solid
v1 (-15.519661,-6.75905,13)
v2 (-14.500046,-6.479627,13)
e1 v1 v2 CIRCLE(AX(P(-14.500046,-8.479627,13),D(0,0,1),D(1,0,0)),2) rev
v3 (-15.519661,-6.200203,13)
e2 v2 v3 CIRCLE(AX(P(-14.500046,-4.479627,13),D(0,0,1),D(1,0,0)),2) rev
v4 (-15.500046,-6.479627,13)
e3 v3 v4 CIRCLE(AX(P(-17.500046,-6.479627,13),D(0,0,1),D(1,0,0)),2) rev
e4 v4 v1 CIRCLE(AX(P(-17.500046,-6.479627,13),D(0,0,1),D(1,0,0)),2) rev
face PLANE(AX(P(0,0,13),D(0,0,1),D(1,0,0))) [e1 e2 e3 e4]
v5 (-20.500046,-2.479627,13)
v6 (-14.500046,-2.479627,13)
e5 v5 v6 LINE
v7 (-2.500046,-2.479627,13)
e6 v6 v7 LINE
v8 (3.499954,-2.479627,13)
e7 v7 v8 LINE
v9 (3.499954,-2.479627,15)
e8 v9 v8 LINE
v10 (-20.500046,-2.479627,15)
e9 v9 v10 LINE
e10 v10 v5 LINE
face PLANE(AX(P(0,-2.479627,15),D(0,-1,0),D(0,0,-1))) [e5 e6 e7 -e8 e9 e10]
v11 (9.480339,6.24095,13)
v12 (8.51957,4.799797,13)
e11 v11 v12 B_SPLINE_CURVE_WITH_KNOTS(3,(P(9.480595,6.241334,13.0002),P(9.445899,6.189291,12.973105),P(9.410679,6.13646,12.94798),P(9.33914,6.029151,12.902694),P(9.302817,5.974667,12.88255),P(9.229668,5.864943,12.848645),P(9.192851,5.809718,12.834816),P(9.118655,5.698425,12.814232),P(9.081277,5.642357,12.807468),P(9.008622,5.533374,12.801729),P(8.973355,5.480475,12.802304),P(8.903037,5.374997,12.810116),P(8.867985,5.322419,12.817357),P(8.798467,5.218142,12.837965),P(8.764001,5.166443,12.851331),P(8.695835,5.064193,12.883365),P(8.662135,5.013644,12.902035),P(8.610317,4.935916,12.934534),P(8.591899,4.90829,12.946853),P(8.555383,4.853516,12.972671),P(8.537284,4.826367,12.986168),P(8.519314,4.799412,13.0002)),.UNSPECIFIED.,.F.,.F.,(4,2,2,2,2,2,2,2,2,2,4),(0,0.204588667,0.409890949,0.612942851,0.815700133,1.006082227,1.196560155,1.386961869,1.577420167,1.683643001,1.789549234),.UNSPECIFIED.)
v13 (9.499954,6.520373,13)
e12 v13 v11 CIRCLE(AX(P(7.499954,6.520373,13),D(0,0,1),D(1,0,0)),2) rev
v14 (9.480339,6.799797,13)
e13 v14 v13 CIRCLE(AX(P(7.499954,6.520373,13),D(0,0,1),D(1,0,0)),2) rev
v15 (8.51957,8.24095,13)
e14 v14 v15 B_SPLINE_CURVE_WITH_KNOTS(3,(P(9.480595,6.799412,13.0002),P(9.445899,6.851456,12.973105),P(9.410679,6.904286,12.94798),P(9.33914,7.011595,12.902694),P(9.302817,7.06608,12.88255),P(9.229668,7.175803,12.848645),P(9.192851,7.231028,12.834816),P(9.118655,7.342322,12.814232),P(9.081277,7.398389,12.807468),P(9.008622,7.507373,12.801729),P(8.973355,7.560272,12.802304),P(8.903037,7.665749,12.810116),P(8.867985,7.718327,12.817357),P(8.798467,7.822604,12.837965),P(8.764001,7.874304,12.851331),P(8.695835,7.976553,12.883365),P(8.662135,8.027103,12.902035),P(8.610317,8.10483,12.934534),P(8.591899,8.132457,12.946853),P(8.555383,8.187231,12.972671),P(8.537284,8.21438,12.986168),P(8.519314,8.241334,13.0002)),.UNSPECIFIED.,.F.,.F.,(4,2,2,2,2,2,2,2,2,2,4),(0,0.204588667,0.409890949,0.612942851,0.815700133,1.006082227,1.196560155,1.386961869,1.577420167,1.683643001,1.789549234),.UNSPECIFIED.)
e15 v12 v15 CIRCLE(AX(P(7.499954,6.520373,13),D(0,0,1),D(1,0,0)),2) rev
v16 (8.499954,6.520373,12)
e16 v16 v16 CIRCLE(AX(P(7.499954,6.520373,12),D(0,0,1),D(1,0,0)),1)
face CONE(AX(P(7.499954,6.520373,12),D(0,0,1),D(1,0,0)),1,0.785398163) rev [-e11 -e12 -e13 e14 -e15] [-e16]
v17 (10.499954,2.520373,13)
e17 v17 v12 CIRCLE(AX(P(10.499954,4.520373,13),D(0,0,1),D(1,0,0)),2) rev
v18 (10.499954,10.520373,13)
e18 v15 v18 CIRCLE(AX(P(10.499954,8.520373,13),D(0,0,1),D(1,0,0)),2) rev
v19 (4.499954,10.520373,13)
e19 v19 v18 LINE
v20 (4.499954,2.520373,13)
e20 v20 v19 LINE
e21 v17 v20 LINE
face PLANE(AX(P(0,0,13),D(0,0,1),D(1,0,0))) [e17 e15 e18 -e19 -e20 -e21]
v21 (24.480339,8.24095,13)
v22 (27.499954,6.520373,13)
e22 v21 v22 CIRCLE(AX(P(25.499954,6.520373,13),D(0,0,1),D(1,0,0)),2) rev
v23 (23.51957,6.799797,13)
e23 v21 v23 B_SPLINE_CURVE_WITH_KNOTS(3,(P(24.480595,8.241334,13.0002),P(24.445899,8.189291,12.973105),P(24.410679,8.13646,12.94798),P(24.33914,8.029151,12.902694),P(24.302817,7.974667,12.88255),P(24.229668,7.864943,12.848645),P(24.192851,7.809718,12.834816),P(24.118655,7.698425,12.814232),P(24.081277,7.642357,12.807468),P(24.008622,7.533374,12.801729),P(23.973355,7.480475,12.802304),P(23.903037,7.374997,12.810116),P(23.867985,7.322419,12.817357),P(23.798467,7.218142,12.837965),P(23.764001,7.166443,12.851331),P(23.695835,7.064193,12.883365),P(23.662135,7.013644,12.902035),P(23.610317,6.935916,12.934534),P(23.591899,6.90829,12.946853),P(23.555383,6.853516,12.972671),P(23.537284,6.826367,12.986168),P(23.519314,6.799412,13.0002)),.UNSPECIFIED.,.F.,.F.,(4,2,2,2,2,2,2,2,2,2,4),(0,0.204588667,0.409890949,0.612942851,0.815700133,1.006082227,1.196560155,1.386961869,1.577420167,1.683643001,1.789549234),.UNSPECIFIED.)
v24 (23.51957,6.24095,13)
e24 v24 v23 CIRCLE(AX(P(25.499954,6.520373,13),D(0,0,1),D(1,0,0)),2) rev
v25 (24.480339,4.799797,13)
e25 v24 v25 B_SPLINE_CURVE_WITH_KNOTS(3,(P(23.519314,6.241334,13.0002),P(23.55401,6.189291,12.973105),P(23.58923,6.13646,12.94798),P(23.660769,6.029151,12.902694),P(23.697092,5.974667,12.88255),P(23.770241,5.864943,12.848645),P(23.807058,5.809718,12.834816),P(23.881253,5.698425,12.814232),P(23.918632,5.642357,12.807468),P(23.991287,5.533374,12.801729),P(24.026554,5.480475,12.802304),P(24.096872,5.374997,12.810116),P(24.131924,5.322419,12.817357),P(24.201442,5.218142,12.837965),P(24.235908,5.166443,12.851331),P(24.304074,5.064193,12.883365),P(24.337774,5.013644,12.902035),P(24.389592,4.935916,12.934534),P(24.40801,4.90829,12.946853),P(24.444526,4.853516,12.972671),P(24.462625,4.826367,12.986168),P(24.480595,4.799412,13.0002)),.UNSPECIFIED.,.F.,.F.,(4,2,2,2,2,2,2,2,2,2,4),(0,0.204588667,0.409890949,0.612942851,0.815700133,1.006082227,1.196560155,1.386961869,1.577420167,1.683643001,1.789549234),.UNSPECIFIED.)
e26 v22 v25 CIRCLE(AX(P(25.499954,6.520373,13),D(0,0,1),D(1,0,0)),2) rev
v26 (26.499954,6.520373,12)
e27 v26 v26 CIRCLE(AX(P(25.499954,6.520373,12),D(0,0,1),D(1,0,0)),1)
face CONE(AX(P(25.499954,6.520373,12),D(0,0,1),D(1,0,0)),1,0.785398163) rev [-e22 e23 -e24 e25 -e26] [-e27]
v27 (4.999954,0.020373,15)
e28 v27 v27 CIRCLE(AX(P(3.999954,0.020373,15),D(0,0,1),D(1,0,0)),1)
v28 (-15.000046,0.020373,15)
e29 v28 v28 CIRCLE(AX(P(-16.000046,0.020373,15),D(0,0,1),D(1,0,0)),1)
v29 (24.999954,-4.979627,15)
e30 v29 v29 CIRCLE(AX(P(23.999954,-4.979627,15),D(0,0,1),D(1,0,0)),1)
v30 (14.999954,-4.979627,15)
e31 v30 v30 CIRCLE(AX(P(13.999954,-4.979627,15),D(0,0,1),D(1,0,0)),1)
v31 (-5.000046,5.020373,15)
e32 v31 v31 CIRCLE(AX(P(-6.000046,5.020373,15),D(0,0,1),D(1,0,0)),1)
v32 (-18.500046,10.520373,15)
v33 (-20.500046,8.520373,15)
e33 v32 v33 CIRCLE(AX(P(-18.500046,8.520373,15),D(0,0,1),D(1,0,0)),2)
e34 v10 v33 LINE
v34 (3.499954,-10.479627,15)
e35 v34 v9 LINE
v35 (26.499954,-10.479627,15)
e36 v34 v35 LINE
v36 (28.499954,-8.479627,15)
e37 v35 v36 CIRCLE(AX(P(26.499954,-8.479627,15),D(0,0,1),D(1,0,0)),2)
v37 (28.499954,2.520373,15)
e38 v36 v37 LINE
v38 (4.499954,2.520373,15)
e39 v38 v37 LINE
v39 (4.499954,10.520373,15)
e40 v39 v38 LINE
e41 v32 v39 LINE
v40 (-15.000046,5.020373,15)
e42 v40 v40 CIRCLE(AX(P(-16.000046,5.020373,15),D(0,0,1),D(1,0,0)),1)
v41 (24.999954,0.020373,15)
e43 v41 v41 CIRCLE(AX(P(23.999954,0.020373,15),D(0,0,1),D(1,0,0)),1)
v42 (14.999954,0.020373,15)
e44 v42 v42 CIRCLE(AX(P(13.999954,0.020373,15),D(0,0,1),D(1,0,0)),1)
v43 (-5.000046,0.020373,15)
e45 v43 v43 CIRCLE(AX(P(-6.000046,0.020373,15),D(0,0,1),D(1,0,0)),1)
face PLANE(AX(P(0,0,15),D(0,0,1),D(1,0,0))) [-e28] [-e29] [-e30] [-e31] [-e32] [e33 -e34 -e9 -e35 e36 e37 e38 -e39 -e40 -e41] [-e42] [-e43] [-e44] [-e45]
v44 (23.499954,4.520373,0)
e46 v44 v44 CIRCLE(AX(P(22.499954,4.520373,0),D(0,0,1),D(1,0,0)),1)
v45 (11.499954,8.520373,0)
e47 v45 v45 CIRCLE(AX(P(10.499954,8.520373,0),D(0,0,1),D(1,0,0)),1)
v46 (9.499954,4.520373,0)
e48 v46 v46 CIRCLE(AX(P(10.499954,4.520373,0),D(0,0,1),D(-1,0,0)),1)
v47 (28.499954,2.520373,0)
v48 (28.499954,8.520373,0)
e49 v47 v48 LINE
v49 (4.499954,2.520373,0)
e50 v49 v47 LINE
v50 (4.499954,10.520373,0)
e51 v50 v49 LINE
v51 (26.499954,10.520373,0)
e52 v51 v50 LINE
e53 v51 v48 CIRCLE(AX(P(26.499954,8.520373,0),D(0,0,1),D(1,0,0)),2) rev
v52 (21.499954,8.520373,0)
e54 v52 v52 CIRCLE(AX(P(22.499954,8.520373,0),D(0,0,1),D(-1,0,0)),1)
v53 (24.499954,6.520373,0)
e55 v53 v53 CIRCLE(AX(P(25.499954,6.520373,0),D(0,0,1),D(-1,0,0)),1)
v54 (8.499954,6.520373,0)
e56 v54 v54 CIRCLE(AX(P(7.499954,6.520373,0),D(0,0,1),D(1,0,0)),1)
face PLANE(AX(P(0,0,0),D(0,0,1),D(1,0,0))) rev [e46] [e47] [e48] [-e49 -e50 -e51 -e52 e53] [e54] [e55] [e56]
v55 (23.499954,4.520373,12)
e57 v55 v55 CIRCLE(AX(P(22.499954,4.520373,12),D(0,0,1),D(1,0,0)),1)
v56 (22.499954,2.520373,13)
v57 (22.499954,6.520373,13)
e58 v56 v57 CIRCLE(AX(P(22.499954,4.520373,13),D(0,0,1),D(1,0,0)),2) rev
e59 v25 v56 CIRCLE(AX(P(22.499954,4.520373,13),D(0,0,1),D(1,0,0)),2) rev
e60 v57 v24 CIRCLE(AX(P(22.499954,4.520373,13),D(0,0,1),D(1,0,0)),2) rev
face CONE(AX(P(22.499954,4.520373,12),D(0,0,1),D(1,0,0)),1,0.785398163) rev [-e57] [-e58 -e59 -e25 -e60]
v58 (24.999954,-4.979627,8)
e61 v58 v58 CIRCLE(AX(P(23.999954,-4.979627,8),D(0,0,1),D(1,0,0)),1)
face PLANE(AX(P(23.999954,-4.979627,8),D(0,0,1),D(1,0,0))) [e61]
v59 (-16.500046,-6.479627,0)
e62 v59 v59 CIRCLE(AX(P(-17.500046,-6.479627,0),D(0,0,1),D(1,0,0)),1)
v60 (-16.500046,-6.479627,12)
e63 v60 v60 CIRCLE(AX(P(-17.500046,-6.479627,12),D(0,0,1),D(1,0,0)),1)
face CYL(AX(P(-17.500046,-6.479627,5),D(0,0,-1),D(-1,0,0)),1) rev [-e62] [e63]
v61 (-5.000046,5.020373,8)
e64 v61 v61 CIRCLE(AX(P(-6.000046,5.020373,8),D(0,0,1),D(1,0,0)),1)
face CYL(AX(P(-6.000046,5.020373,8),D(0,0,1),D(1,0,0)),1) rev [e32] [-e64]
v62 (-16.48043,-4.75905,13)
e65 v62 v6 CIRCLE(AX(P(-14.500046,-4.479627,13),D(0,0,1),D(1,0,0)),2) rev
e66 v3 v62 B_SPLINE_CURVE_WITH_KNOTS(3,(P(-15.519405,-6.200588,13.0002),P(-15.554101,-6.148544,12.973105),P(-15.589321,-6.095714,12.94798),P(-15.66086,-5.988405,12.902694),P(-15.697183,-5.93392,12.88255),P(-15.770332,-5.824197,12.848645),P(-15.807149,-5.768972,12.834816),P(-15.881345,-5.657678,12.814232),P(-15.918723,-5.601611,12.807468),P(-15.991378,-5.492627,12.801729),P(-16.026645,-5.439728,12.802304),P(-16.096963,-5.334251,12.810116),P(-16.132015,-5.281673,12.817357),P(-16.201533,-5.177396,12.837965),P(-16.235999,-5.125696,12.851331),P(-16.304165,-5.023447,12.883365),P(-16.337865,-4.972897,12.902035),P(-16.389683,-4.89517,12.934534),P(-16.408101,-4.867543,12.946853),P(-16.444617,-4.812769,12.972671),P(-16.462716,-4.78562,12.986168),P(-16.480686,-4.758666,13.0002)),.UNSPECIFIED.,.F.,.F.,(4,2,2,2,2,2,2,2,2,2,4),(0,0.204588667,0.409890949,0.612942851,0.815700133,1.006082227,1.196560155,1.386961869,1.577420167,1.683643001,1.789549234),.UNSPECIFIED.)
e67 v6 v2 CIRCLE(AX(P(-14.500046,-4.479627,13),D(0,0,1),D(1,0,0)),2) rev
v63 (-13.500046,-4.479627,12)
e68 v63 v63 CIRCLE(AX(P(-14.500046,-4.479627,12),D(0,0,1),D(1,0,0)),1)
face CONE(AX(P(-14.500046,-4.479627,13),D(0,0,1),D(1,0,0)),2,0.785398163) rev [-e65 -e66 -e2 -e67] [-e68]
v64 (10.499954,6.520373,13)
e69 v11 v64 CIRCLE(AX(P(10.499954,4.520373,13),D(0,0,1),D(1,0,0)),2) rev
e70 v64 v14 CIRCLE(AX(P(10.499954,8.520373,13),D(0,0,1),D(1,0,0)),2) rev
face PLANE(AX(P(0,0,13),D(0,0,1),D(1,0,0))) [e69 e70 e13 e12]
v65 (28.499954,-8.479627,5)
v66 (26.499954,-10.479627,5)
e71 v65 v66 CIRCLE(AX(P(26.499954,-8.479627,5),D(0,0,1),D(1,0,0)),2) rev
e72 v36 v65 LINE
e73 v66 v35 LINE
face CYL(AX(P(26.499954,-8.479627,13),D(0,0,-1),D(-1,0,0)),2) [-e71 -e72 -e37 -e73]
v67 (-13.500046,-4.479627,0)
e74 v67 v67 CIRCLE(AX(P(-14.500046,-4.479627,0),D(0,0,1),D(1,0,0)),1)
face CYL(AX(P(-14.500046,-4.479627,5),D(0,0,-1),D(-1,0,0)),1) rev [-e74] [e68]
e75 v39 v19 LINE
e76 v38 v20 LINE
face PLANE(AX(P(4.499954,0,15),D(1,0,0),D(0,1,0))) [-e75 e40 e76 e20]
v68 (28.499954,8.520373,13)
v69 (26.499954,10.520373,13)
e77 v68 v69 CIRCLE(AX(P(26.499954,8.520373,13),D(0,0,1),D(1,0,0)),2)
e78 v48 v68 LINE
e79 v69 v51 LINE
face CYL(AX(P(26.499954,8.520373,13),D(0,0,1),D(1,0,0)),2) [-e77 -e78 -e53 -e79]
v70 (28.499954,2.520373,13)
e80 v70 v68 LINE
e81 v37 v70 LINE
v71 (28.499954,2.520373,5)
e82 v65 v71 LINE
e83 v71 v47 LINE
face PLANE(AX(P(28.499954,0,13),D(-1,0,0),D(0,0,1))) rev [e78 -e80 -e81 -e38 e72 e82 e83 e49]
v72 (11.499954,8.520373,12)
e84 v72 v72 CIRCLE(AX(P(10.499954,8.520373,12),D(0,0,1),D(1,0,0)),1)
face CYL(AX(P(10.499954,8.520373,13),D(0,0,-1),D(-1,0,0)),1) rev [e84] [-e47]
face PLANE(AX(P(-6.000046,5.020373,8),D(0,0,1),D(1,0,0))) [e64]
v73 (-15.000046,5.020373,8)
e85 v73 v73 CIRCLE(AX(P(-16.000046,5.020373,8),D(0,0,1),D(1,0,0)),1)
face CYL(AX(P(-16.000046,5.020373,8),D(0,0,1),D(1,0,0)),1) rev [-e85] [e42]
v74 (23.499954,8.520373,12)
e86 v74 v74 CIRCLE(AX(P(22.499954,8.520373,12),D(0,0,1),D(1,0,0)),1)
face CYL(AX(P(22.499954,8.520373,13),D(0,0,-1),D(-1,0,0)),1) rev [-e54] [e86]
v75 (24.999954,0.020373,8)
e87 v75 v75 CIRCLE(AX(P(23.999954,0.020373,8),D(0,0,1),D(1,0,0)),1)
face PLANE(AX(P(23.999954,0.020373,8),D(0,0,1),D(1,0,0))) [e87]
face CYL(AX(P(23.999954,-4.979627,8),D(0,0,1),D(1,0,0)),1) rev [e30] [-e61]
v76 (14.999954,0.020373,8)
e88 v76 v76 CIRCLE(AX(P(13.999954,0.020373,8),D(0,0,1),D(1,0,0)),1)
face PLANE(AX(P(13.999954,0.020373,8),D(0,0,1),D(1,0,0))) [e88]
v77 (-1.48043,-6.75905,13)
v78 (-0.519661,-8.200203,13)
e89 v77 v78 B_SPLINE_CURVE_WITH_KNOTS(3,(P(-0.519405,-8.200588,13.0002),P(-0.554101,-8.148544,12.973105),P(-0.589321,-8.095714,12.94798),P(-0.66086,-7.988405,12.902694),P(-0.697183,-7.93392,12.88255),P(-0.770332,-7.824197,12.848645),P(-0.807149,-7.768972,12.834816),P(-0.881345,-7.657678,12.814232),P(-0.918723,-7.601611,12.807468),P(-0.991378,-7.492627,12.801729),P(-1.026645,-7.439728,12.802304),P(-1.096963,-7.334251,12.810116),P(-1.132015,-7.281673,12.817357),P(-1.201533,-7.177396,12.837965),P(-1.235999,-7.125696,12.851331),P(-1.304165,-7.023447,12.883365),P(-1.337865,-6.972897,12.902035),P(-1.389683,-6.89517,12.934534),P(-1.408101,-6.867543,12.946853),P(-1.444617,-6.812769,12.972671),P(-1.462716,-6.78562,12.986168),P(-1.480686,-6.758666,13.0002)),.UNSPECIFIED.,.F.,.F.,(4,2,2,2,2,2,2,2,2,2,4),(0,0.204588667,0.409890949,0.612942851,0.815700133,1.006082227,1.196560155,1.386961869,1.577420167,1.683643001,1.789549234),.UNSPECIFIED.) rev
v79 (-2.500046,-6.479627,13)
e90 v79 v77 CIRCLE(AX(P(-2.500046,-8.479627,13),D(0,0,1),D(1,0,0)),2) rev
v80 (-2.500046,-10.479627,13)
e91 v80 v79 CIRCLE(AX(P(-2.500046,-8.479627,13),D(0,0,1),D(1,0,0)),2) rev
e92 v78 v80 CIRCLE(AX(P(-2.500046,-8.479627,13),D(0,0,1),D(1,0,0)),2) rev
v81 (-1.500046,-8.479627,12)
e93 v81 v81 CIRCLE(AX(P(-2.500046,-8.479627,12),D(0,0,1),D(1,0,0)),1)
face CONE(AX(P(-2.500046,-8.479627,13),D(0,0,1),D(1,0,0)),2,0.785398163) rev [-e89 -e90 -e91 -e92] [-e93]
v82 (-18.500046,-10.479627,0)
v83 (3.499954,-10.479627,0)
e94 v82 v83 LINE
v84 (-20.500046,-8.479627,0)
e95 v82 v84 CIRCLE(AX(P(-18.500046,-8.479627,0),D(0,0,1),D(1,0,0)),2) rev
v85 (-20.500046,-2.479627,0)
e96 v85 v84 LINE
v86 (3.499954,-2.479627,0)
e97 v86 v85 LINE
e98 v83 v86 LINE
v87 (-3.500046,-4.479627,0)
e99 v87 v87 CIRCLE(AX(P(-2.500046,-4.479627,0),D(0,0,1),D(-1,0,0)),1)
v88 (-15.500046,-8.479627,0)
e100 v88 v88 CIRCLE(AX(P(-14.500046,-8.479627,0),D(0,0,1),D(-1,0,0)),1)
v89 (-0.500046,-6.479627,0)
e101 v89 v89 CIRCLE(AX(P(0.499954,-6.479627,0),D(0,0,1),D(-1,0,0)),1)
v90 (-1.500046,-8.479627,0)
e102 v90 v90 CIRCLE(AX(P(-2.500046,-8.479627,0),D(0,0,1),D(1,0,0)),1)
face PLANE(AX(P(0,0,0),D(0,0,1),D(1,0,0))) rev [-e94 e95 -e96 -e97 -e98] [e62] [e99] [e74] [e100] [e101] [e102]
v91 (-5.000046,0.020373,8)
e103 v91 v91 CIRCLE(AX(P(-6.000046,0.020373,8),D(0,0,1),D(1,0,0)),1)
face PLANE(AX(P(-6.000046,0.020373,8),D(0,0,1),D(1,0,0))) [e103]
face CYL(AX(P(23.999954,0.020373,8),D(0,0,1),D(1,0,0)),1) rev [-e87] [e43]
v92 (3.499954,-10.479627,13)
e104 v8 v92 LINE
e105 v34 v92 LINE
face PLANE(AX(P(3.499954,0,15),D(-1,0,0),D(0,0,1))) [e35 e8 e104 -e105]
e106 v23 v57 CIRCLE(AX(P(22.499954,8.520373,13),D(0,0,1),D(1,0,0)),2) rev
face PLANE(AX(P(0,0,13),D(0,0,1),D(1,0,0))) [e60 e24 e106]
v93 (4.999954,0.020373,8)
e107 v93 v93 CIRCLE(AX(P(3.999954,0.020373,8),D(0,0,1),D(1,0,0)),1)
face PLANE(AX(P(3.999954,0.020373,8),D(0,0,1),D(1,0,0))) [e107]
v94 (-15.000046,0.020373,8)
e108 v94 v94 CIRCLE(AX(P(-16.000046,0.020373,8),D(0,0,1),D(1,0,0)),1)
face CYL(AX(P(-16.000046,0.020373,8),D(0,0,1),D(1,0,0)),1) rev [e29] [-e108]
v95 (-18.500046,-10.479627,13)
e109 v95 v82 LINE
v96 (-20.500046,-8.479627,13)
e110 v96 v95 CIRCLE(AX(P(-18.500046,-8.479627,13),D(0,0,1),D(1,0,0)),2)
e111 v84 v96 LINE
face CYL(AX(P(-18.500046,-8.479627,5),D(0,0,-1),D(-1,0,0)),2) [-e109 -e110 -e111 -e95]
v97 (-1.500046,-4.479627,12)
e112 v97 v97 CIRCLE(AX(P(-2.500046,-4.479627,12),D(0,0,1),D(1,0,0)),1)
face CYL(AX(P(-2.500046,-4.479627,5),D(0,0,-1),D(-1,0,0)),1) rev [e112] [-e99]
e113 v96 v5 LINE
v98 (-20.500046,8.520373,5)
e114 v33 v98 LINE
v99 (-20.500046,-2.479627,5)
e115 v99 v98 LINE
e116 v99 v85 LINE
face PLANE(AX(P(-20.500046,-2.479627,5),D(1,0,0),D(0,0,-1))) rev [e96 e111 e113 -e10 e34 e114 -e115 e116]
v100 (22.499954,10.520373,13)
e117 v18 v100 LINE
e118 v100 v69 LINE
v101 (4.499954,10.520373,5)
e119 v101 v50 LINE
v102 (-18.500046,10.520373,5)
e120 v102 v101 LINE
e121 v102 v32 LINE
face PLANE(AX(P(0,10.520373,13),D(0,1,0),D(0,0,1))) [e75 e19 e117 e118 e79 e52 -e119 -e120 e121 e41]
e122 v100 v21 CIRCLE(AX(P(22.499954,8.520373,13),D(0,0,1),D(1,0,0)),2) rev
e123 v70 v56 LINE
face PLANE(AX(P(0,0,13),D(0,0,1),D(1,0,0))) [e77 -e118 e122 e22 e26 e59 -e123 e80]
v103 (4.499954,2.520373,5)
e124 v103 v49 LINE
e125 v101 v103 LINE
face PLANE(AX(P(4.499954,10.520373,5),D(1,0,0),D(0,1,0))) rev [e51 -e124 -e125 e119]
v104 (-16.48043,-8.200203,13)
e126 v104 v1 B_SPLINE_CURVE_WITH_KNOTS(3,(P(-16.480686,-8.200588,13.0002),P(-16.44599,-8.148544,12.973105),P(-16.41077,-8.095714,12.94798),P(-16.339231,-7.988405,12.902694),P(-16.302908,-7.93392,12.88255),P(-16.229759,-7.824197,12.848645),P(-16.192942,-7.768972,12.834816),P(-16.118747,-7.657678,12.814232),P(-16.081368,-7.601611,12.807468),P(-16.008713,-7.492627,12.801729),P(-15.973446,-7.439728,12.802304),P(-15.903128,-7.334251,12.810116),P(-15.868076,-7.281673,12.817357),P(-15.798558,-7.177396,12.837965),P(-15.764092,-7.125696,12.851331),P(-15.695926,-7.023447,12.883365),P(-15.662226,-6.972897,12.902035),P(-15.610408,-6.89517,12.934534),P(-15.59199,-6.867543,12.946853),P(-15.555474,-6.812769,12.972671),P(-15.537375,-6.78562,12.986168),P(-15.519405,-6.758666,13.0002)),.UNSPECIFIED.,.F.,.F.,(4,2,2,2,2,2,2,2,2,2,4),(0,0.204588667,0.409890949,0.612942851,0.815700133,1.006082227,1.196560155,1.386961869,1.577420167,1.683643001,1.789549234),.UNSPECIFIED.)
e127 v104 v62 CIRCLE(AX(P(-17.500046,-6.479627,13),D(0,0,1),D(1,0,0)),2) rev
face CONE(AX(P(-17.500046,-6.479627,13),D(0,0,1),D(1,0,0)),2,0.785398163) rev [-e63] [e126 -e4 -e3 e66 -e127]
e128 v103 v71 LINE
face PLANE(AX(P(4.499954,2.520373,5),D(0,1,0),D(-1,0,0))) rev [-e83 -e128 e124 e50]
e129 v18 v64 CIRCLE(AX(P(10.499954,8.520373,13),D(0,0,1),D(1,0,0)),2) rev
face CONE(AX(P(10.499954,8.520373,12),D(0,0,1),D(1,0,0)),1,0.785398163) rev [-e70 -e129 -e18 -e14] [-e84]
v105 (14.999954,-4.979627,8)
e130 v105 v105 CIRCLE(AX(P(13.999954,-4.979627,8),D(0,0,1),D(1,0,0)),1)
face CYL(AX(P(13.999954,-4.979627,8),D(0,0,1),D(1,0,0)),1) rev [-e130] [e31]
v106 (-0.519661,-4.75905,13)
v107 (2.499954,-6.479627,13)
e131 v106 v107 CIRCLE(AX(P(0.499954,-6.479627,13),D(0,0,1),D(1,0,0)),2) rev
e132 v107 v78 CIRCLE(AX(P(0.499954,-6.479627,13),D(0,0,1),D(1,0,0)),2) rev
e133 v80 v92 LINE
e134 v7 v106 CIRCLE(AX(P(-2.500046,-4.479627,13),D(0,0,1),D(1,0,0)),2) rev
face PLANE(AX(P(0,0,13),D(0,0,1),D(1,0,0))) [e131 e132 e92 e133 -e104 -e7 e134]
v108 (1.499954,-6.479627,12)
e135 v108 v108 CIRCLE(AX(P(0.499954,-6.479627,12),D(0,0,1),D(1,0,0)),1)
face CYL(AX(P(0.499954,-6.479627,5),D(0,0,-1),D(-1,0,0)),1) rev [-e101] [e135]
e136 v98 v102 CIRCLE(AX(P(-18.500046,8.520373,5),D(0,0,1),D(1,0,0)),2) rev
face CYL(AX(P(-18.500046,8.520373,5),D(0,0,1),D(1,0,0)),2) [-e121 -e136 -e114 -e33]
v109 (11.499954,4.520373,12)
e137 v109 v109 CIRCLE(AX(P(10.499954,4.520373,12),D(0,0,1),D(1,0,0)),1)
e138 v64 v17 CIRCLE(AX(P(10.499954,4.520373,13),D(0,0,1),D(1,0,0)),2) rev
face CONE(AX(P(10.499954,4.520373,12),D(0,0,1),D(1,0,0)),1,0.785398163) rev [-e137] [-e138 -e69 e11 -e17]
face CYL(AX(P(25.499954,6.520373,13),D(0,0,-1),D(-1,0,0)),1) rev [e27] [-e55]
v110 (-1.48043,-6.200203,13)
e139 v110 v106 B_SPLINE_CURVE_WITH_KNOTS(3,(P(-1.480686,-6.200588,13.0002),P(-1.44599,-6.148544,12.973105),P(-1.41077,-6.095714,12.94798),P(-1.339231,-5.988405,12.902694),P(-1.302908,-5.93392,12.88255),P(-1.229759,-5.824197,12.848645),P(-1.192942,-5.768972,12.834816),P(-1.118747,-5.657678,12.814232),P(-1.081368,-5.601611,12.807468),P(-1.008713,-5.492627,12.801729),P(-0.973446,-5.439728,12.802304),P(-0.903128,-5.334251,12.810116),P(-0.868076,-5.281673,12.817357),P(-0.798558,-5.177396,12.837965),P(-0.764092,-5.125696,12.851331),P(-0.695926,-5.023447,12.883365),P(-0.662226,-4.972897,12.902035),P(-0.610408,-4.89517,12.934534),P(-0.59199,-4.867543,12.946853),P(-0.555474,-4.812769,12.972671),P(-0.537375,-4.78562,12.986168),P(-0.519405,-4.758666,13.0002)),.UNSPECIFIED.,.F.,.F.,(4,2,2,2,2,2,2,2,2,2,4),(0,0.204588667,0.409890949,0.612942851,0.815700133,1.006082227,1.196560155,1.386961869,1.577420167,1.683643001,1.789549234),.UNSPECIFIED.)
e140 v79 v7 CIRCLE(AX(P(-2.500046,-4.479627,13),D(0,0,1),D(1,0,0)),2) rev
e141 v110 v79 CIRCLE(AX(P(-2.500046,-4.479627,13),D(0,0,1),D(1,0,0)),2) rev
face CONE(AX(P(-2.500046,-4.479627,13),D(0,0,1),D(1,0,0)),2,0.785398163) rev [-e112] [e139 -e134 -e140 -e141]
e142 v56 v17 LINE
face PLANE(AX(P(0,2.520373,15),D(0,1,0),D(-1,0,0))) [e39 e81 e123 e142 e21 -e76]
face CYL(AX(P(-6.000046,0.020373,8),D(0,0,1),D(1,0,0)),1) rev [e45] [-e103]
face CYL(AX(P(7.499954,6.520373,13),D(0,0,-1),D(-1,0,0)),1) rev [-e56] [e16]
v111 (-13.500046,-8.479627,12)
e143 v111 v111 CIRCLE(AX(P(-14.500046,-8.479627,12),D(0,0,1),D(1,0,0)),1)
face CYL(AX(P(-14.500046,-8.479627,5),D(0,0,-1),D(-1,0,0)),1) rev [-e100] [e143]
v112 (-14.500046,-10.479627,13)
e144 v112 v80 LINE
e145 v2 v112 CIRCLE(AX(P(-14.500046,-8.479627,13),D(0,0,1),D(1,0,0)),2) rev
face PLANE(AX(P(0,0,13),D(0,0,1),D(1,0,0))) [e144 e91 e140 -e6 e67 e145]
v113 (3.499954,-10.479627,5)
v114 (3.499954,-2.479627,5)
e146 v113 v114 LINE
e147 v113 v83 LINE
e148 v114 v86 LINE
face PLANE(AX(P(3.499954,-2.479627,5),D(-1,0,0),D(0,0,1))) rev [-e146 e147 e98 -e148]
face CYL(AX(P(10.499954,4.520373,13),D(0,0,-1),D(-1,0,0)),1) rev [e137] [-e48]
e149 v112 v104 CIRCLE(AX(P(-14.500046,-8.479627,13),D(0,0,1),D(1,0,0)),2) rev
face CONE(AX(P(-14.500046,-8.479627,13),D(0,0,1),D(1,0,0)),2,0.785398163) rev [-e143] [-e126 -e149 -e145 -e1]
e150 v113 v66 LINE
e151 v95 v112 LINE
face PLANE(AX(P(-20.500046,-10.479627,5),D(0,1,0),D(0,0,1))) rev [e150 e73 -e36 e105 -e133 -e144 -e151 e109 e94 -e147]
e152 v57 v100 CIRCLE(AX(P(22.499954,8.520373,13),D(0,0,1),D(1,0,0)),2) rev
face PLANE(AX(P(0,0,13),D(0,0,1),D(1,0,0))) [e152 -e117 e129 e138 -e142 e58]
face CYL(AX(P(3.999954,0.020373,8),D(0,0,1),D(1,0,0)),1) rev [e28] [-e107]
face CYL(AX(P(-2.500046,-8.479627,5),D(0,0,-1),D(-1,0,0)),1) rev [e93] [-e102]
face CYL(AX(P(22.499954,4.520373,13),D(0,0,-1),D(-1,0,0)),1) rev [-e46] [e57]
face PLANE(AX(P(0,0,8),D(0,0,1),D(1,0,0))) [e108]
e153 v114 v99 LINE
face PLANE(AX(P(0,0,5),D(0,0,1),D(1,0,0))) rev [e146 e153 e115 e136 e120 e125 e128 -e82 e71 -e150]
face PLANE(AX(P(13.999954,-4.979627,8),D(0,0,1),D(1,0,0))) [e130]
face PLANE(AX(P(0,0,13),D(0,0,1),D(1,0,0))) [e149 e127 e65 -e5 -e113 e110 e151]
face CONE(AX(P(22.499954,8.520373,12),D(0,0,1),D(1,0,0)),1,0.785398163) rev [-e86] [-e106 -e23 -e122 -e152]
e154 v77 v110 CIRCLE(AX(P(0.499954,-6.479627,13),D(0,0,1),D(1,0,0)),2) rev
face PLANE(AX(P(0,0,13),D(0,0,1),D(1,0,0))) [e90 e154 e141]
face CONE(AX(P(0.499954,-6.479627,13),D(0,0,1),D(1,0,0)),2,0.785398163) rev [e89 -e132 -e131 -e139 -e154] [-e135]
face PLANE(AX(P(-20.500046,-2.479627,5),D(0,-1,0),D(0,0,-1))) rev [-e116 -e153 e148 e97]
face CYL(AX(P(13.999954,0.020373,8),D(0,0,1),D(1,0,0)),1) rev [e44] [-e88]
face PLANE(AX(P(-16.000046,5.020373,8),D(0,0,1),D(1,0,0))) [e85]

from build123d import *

# Parameters (mm, degrees)
SKETCH1_W             = 24
SKETCH1_H             = 8
SKETCH1_R             = 1
BOSS_EXTRUDE1_DEPTH   = 5
BOSS_EXTRUDE1_2_DEPTH = 5
SKETCH2_W             = 24
SKETCH2_H             = 8
SKETCH2_R             = 1
BOSS_EXTRUDE2_DEPTH   = 8
BOSS_EXTRUDE3_DEPTH   = 10
CHAMFER1_SIZE         = 1
FILLET1_R             = 2
SKETCH3_R             = 1
CUT_EXTRUDE1_DEPTH    = 7


with BuildPart() as part:
    # Sketch1 → Boss-Extrude1 (new body)
    with BuildSketch(Plane.XY):
        with Locations((-8.500045519, -6.479626746)):
            Rectangle(SKETCH1_W, SKETCH1_H)
        with Locations(Location((0.499954481, -6.479626746, 0), (0, 0, 180))):
            Circle(SKETCH1_R, mode=Mode.SUBTRACT)
        with Locations((-14.500045519, -4.479626746)):
            Circle(SKETCH1_R, mode=Mode.SUBTRACT)
        with Locations((-2.500045519, -8.479626746)):
            Circle(SKETCH1_R, mode=Mode.SUBTRACT)
        with Locations((-17.500045519, -6.479626746)):
            Circle(SKETCH1_R, mode=Mode.SUBTRACT)
        with Locations(Location((-14.500045519, -8.479626746, 0), (0, 0, 180))):
            Circle(SKETCH1_R, mode=Mode.SUBTRACT)
        with Locations(Location((-2.500045519, -4.479626746, 0), (0, 0, 180))):
            Circle(SKETCH1_R, mode=Mode.SUBTRACT)
    extrude(amount=BOSS_EXTRUDE1_DEPTH)



with BuildPart() as body_2:
    # Sketch1 → Boss-Extrude1 2 (new body)
    with BuildSketch(Plane.XY):
        with Locations((16.499954481, 6.520373254)):
            Rectangle(SKETCH1_W, SKETCH1_H)
        with Locations((10.499954481, 8.520373254)):
            Circle(SKETCH1_R, mode=Mode.SUBTRACT)
        with Locations((7.499954481, 6.520373254)):
            Circle(SKETCH1_R, mode=Mode.SUBTRACT)
        with Locations(Location((10.499954481, 4.520373254, 0), (0, 0, 180))):
            Circle(SKETCH1_R, mode=Mode.SUBTRACT)
        with Locations((22.499954481, 4.520373254)):
            Circle(SKETCH1_R, mode=Mode.SUBTRACT)
        with Locations(Location((25.499954481, 6.520373254, 0), (0, 0, 180))):
            Circle(SKETCH1_R, mode=Mode.SUBTRACT)
        with Locations(Location((22.499954481, 8.520373254, 0), (0, 0, 180))):
            Circle(SKETCH1_R, mode=Mode.SUBTRACT)
    extrude(amount=BOSS_EXTRUDE1_2_DEPTH)


with BuildPart() as part_1:
    add(part.part)

    add(body_2.part)  # Boss-Extrude2 merges body 2
    # Sketch2 → Boss-Extrude2 (add)
    # profile 1 of 3: a face of its own
    with BuildSketch(Plane.XY.offset(5)):
        with Locations((-8.500045519, -6.479626746)):
            Rectangle(SKETCH2_W, SKETCH2_H)
        with Locations(Location((-14.500045519, -8.479626746, 0), (0, 0, 180))):
            Circle(SKETCH2_R, mode=Mode.SUBTRACT)
        with Locations((-17.500045519, -6.479626746)):
            Circle(SKETCH2_R, mode=Mode.SUBTRACT)
        with Locations((-2.500045519, -8.479626746)):
            Circle(SKETCH2_R, mode=Mode.SUBTRACT)
        with Locations(Location((0.499954481, -6.479626746, 0), (0, 0, 180))):
            Circle(SKETCH2_R, mode=Mode.SUBTRACT)
        with Locations((-14.500045519, -4.479626746)):
            Circle(SKETCH2_R, mode=Mode.SUBTRACT)
        with Locations(Location((-2.500045519, -4.479626746, 0), (0, 0, 180))):
            Circle(SKETCH2_R, mode=Mode.SUBTRACT)
    # profile 2 of 3: a face of its own
    with BuildSketch(Plane.XY.offset(5)):
        Polygon((3.499954481, -2.479626746), (3.499954481, -10.479626746), (28.499954481, -10.479626746), (28.499954481, 2.520373254), (4.499954481, 2.520373254), (4.499954481, 10.520373254), (-20.500045519, 10.520373254), (-20.500045519, -2.479626746), align=None)
    # profile 3 of 3: a face of its own
    with BuildSketch(Plane.XY.offset(5)):
        with Locations((16.499954481, 6.520373254)):
            Rectangle(SKETCH2_W, SKETCH2_H)
        with Locations(Location((10.499954481, 4.520373254, 0), (0, 0, 180))):
            Circle(SKETCH2_R, mode=Mode.SUBTRACT)
        with Locations((22.499954481, 4.520373254)):
            Circle(SKETCH2_R, mode=Mode.SUBTRACT)
        with Locations((7.499954481, 6.520373254)):
            Circle(SKETCH2_R, mode=Mode.SUBTRACT)
        with Locations((10.499954481, 8.520373254)):
            Circle(SKETCH2_R, mode=Mode.SUBTRACT)
        with Locations(Location((25.499954481, 6.520373254, 0), (0, 0, 180))):
            Circle(SKETCH2_R, mode=Mode.SUBTRACT)
        with Locations(Location((22.499954481, 8.520373254, 0), (0, 0, 180))):
            Circle(SKETCH2_R, mode=Mode.SUBTRACT)
    extrude(amount=BOSS_EXTRUDE2_DEPTH)

    # Sketch2<6> → Boss-Extrude3 (add)
    with BuildSketch(Plane.XY.offset(5)):
        Polygon((3.499954481, -2.479626746), (3.499954481, -10.479626746), (28.499954481, -10.479626746), (28.499954481, 2.520373254), (4.499954481, 2.520373254), (4.499954481, 10.520373254), (-20.500045519, 10.520373254), (-20.500045519, -2.479626746), align=None)
    extrude(amount=BOSS_EXTRUDE3_DEPTH)

    # Chamfer1
    # the kernel refuses this chamfer: 1 mm, written as the material it takes off along each edge
    with BuildSketch(Plane(origin=(25.499954481, 6.520373254, 13), x_dir=(-1, 0, 0), z_dir=(0, 1, 0))) as chamfer1_piece_1:
        Polygon((1 + CHAMFER1_SIZE, 0), (1, -CHAMFER1_SIZE), (1, 0), align=None)
    revolve(axis=Axis((25.499954481, 6.520373254, 13), (0, 0, 1)), mode=Mode.SUBTRACT)
    with BuildSketch(Plane(origin=(22.499954481, 8.520373254, 13), x_dir=(-1, 0, 0), z_dir=(0, 1, 0))) as chamfer1_piece_2:
        Polygon((1 + CHAMFER1_SIZE, 0), (1, -CHAMFER1_SIZE), (1, 0), align=None)
    revolve(axis=Axis((22.499954481, 8.520373254, 13), (0, 0, 1)), mode=Mode.SUBTRACT)
    with BuildSketch(Plane(origin=(10.499954481, 4.520373254, 13), x_dir=(-1, 0, 0), z_dir=(0, 1, 0))) as chamfer1_piece_3_section:
        Polygon((1 + CHAMFER1_SIZE, 0), (1, -CHAMFER1_SIZE), (1, 0), align=None)
    chamfer1_piece_3 = revolve(axis=Axis((10.499954481, 4.520373254, 13), (0, 0, 1)), mode=Mode.PRIVATE)
    chamfer1_piece_3 = split(chamfer1_piece_3, bisect_by=Plane(origin=(11.988197193, 2.520373254, 12.511757288), z_dir=(0, 1, 0)), keep=Keep.TOP, mode=Mode.PRIVATE)
    add(chamfer1_piece_3, mode=Mode.SUBTRACT)
    with BuildSketch(Plane(origin=(10.499954481, 8.520373254, 13), x_dir=(1, 0, 0), z_dir=(0, -1, 0))) as chamfer1_piece_4:
        Polygon((1 + CHAMFER1_SIZE, 0), (1, -CHAMFER1_SIZE), (1, 0), align=None)
    revolve(axis=Axis((10.499954481, 8.520373254, 13), (0, 0, 1)), mode=Mode.SUBTRACT)
    with BuildSketch(Plane(origin=(7.499954481, 6.520373254, 13), x_dir=(1, 0, 0), z_dir=(0, -1, 0))) as chamfer1_piece_5:
        Polygon((1 + CHAMFER1_SIZE, 0), (1, -CHAMFER1_SIZE), (1, 0), align=None)
    revolve(axis=Axis((7.499954481, 6.520373254, 13), (0, 0, 1)), mode=Mode.SUBTRACT)
    with BuildSketch(Plane(origin=(22.499954481, 4.520373254, 13), x_dir=(1, 0, 0), z_dir=(0, -1, 0))) as chamfer1_piece_6_section:
        Polygon((1 + CHAMFER1_SIZE, 0), (1, -CHAMFER1_SIZE), (1, 0), align=None)
    chamfer1_piece_6 = revolve(axis=Axis((22.499954481, 4.520373254, 13), (0, 0, 1)), mode=Mode.PRIVATE)
    chamfer1_piece_6 = split(chamfer1_piece_6, bisect_by=Plane(origin=(21.011711773, 2.520373254, 12.511757292), z_dir=(0, 1, 0)), keep=Keep.TOP, mode=Mode.PRIVATE)
    add(chamfer1_piece_6, mode=Mode.SUBTRACT)
    with BuildSketch(Plane(origin=(-14.500045519, -8.479626746, 13), x_dir=(-1, 0, 0), z_dir=(0, 1, 0))) as chamfer1_piece_7:
        Polygon((1 + CHAMFER1_SIZE, 0), (1, -CHAMFER1_SIZE), (1, 0), align=None)
    revolve(axis=Axis((-14.500045519, -8.479626746, 13), (0, 0, 1)), mode=Mode.SUBTRACT)
    with BuildSketch(Plane(origin=(-2.500045519, -8.479626746, 13), x_dir=(1, 0, 0), z_dir=(0, -1, 0))) as chamfer1_piece_8:
        Polygon((1 + CHAMFER1_SIZE, 0), (1, -CHAMFER1_SIZE), (1, 0), align=None)
    revolve(axis=Axis((-2.500045519, -8.479626746, 13), (0, 0, 1)), mode=Mode.SUBTRACT)
    with BuildSketch(Plane(origin=(-2.500045519, -4.479626746, 13), x_dir=(-1, 0, 0), z_dir=(0, 1, 0))) as chamfer1_piece_9_section:
        Polygon((1 + CHAMFER1_SIZE, 0), (1, -CHAMFER1_SIZE), (1, 0), align=None)
    chamfer1_piece_9 = revolve(axis=Axis((-2.500045519, -4.479626746, 13), (0, 0, 1)), mode=Mode.PRIVATE)
    chamfer1_piece_9 = split(chamfer1_piece_9, bisect_by=Plane(origin=(-1.011802811, -2.479626746, 12.511757292), z_dir=(0, -1, 0)), keep=Keep.TOP, mode=Mode.PRIVATE)
    add(chamfer1_piece_9, mode=Mode.SUBTRACT)
    with BuildSketch(Plane(origin=(-17.500045519, -6.479626746, 13), x_dir=(1, 0, 0), z_dir=(0, -1, 0))) as chamfer1_piece_10:
        Polygon((1 + CHAMFER1_SIZE, 0), (1, -CHAMFER1_SIZE), (1, 0), align=None)
    revolve(axis=Axis((-17.500045519, -6.479626746, 13), (0, 0, 1)), mode=Mode.SUBTRACT)
    with BuildSketch(Plane(origin=(-14.500045519, -4.479626746, 13), x_dir=(1, 0, 0), z_dir=(0, -1, 0))) as chamfer1_piece_11_section:
        Polygon((1 + CHAMFER1_SIZE, 0), (1, -CHAMFER1_SIZE), (1, 0), align=None)
    chamfer1_piece_11 = revolve(axis=Axis((-14.500045519, -4.479626746, 13), (0, 0, 1)), mode=Mode.PRIVATE)
    chamfer1_piece_11 = split(chamfer1_piece_11, bisect_by=Plane(origin=(-15.988288231, -2.479626746, 12.511757288), z_dir=(0, -1, 0)), keep=Keep.TOP, mode=Mode.PRIVATE)
    add(chamfer1_piece_11, mode=Mode.SUBTRACT)
    with BuildSketch(Plane(origin=(0.499954481, -6.479626746, 13), x_dir=(-1, 0, 0), z_dir=(0, 1, 0))) as chamfer1_piece_12:
        Polygon((1 + CHAMFER1_SIZE, 0), (1, -CHAMFER1_SIZE), (1, 0), align=None)
    revolve(axis=Axis((0.499954481, -6.479626746, 13), (0, 0, 1)), mode=Mode.SUBTRACT)

    # Fillet1
    fillet1_edges = [part_1.edges().sort_by_distance(p)[0] for p in [
        (28.499954481, -10.479626746, 10),
        (28.499954481, 10.520373254, 6.5),
        (-20.500045519, 10.520373254, 10),
        (-20.500045519, -10.479626746, 6.5),
    ]]
    fillet(fillet1_edges, radius=FILLET1_R)

    # Sketch3 → Cut-Extrude1 (cut)
    with BuildSketch(Plane.XY.offset(15)):
        with Locations((-16.000045519, 0.020373254)):
            Circle(SKETCH3_R)
        with Locations((-16.000045519, 5.020373254)):
            Circle(SKETCH3_R)
        with Locations((-6.000045519, 5.020373254)):
            Circle(SKETCH3_R)
        with Locations((-6.000045519, 0.020373254)):
            Circle(SKETCH3_R)
        with Locations((3.999954481, 0.020373254)):
            Circle(SKETCH3_R)
        with Locations((13.999954481, 0.020373254)):
            Circle(SKETCH3_R)
        with Locations((13.999954481, -4.979626746)):
            Circle(SKETCH3_R)
        with Locations((23.999954481, 0.020373254)):
            Circle(SKETCH3_R)
        with Locations((23.999954481, -4.979626746)):
            Circle(SKETCH3_R)
    extrude(amount=-CUT_EXTRUDE1_DEPTH, mode=Mode.SUBTRACT)


solid = part_1.part
